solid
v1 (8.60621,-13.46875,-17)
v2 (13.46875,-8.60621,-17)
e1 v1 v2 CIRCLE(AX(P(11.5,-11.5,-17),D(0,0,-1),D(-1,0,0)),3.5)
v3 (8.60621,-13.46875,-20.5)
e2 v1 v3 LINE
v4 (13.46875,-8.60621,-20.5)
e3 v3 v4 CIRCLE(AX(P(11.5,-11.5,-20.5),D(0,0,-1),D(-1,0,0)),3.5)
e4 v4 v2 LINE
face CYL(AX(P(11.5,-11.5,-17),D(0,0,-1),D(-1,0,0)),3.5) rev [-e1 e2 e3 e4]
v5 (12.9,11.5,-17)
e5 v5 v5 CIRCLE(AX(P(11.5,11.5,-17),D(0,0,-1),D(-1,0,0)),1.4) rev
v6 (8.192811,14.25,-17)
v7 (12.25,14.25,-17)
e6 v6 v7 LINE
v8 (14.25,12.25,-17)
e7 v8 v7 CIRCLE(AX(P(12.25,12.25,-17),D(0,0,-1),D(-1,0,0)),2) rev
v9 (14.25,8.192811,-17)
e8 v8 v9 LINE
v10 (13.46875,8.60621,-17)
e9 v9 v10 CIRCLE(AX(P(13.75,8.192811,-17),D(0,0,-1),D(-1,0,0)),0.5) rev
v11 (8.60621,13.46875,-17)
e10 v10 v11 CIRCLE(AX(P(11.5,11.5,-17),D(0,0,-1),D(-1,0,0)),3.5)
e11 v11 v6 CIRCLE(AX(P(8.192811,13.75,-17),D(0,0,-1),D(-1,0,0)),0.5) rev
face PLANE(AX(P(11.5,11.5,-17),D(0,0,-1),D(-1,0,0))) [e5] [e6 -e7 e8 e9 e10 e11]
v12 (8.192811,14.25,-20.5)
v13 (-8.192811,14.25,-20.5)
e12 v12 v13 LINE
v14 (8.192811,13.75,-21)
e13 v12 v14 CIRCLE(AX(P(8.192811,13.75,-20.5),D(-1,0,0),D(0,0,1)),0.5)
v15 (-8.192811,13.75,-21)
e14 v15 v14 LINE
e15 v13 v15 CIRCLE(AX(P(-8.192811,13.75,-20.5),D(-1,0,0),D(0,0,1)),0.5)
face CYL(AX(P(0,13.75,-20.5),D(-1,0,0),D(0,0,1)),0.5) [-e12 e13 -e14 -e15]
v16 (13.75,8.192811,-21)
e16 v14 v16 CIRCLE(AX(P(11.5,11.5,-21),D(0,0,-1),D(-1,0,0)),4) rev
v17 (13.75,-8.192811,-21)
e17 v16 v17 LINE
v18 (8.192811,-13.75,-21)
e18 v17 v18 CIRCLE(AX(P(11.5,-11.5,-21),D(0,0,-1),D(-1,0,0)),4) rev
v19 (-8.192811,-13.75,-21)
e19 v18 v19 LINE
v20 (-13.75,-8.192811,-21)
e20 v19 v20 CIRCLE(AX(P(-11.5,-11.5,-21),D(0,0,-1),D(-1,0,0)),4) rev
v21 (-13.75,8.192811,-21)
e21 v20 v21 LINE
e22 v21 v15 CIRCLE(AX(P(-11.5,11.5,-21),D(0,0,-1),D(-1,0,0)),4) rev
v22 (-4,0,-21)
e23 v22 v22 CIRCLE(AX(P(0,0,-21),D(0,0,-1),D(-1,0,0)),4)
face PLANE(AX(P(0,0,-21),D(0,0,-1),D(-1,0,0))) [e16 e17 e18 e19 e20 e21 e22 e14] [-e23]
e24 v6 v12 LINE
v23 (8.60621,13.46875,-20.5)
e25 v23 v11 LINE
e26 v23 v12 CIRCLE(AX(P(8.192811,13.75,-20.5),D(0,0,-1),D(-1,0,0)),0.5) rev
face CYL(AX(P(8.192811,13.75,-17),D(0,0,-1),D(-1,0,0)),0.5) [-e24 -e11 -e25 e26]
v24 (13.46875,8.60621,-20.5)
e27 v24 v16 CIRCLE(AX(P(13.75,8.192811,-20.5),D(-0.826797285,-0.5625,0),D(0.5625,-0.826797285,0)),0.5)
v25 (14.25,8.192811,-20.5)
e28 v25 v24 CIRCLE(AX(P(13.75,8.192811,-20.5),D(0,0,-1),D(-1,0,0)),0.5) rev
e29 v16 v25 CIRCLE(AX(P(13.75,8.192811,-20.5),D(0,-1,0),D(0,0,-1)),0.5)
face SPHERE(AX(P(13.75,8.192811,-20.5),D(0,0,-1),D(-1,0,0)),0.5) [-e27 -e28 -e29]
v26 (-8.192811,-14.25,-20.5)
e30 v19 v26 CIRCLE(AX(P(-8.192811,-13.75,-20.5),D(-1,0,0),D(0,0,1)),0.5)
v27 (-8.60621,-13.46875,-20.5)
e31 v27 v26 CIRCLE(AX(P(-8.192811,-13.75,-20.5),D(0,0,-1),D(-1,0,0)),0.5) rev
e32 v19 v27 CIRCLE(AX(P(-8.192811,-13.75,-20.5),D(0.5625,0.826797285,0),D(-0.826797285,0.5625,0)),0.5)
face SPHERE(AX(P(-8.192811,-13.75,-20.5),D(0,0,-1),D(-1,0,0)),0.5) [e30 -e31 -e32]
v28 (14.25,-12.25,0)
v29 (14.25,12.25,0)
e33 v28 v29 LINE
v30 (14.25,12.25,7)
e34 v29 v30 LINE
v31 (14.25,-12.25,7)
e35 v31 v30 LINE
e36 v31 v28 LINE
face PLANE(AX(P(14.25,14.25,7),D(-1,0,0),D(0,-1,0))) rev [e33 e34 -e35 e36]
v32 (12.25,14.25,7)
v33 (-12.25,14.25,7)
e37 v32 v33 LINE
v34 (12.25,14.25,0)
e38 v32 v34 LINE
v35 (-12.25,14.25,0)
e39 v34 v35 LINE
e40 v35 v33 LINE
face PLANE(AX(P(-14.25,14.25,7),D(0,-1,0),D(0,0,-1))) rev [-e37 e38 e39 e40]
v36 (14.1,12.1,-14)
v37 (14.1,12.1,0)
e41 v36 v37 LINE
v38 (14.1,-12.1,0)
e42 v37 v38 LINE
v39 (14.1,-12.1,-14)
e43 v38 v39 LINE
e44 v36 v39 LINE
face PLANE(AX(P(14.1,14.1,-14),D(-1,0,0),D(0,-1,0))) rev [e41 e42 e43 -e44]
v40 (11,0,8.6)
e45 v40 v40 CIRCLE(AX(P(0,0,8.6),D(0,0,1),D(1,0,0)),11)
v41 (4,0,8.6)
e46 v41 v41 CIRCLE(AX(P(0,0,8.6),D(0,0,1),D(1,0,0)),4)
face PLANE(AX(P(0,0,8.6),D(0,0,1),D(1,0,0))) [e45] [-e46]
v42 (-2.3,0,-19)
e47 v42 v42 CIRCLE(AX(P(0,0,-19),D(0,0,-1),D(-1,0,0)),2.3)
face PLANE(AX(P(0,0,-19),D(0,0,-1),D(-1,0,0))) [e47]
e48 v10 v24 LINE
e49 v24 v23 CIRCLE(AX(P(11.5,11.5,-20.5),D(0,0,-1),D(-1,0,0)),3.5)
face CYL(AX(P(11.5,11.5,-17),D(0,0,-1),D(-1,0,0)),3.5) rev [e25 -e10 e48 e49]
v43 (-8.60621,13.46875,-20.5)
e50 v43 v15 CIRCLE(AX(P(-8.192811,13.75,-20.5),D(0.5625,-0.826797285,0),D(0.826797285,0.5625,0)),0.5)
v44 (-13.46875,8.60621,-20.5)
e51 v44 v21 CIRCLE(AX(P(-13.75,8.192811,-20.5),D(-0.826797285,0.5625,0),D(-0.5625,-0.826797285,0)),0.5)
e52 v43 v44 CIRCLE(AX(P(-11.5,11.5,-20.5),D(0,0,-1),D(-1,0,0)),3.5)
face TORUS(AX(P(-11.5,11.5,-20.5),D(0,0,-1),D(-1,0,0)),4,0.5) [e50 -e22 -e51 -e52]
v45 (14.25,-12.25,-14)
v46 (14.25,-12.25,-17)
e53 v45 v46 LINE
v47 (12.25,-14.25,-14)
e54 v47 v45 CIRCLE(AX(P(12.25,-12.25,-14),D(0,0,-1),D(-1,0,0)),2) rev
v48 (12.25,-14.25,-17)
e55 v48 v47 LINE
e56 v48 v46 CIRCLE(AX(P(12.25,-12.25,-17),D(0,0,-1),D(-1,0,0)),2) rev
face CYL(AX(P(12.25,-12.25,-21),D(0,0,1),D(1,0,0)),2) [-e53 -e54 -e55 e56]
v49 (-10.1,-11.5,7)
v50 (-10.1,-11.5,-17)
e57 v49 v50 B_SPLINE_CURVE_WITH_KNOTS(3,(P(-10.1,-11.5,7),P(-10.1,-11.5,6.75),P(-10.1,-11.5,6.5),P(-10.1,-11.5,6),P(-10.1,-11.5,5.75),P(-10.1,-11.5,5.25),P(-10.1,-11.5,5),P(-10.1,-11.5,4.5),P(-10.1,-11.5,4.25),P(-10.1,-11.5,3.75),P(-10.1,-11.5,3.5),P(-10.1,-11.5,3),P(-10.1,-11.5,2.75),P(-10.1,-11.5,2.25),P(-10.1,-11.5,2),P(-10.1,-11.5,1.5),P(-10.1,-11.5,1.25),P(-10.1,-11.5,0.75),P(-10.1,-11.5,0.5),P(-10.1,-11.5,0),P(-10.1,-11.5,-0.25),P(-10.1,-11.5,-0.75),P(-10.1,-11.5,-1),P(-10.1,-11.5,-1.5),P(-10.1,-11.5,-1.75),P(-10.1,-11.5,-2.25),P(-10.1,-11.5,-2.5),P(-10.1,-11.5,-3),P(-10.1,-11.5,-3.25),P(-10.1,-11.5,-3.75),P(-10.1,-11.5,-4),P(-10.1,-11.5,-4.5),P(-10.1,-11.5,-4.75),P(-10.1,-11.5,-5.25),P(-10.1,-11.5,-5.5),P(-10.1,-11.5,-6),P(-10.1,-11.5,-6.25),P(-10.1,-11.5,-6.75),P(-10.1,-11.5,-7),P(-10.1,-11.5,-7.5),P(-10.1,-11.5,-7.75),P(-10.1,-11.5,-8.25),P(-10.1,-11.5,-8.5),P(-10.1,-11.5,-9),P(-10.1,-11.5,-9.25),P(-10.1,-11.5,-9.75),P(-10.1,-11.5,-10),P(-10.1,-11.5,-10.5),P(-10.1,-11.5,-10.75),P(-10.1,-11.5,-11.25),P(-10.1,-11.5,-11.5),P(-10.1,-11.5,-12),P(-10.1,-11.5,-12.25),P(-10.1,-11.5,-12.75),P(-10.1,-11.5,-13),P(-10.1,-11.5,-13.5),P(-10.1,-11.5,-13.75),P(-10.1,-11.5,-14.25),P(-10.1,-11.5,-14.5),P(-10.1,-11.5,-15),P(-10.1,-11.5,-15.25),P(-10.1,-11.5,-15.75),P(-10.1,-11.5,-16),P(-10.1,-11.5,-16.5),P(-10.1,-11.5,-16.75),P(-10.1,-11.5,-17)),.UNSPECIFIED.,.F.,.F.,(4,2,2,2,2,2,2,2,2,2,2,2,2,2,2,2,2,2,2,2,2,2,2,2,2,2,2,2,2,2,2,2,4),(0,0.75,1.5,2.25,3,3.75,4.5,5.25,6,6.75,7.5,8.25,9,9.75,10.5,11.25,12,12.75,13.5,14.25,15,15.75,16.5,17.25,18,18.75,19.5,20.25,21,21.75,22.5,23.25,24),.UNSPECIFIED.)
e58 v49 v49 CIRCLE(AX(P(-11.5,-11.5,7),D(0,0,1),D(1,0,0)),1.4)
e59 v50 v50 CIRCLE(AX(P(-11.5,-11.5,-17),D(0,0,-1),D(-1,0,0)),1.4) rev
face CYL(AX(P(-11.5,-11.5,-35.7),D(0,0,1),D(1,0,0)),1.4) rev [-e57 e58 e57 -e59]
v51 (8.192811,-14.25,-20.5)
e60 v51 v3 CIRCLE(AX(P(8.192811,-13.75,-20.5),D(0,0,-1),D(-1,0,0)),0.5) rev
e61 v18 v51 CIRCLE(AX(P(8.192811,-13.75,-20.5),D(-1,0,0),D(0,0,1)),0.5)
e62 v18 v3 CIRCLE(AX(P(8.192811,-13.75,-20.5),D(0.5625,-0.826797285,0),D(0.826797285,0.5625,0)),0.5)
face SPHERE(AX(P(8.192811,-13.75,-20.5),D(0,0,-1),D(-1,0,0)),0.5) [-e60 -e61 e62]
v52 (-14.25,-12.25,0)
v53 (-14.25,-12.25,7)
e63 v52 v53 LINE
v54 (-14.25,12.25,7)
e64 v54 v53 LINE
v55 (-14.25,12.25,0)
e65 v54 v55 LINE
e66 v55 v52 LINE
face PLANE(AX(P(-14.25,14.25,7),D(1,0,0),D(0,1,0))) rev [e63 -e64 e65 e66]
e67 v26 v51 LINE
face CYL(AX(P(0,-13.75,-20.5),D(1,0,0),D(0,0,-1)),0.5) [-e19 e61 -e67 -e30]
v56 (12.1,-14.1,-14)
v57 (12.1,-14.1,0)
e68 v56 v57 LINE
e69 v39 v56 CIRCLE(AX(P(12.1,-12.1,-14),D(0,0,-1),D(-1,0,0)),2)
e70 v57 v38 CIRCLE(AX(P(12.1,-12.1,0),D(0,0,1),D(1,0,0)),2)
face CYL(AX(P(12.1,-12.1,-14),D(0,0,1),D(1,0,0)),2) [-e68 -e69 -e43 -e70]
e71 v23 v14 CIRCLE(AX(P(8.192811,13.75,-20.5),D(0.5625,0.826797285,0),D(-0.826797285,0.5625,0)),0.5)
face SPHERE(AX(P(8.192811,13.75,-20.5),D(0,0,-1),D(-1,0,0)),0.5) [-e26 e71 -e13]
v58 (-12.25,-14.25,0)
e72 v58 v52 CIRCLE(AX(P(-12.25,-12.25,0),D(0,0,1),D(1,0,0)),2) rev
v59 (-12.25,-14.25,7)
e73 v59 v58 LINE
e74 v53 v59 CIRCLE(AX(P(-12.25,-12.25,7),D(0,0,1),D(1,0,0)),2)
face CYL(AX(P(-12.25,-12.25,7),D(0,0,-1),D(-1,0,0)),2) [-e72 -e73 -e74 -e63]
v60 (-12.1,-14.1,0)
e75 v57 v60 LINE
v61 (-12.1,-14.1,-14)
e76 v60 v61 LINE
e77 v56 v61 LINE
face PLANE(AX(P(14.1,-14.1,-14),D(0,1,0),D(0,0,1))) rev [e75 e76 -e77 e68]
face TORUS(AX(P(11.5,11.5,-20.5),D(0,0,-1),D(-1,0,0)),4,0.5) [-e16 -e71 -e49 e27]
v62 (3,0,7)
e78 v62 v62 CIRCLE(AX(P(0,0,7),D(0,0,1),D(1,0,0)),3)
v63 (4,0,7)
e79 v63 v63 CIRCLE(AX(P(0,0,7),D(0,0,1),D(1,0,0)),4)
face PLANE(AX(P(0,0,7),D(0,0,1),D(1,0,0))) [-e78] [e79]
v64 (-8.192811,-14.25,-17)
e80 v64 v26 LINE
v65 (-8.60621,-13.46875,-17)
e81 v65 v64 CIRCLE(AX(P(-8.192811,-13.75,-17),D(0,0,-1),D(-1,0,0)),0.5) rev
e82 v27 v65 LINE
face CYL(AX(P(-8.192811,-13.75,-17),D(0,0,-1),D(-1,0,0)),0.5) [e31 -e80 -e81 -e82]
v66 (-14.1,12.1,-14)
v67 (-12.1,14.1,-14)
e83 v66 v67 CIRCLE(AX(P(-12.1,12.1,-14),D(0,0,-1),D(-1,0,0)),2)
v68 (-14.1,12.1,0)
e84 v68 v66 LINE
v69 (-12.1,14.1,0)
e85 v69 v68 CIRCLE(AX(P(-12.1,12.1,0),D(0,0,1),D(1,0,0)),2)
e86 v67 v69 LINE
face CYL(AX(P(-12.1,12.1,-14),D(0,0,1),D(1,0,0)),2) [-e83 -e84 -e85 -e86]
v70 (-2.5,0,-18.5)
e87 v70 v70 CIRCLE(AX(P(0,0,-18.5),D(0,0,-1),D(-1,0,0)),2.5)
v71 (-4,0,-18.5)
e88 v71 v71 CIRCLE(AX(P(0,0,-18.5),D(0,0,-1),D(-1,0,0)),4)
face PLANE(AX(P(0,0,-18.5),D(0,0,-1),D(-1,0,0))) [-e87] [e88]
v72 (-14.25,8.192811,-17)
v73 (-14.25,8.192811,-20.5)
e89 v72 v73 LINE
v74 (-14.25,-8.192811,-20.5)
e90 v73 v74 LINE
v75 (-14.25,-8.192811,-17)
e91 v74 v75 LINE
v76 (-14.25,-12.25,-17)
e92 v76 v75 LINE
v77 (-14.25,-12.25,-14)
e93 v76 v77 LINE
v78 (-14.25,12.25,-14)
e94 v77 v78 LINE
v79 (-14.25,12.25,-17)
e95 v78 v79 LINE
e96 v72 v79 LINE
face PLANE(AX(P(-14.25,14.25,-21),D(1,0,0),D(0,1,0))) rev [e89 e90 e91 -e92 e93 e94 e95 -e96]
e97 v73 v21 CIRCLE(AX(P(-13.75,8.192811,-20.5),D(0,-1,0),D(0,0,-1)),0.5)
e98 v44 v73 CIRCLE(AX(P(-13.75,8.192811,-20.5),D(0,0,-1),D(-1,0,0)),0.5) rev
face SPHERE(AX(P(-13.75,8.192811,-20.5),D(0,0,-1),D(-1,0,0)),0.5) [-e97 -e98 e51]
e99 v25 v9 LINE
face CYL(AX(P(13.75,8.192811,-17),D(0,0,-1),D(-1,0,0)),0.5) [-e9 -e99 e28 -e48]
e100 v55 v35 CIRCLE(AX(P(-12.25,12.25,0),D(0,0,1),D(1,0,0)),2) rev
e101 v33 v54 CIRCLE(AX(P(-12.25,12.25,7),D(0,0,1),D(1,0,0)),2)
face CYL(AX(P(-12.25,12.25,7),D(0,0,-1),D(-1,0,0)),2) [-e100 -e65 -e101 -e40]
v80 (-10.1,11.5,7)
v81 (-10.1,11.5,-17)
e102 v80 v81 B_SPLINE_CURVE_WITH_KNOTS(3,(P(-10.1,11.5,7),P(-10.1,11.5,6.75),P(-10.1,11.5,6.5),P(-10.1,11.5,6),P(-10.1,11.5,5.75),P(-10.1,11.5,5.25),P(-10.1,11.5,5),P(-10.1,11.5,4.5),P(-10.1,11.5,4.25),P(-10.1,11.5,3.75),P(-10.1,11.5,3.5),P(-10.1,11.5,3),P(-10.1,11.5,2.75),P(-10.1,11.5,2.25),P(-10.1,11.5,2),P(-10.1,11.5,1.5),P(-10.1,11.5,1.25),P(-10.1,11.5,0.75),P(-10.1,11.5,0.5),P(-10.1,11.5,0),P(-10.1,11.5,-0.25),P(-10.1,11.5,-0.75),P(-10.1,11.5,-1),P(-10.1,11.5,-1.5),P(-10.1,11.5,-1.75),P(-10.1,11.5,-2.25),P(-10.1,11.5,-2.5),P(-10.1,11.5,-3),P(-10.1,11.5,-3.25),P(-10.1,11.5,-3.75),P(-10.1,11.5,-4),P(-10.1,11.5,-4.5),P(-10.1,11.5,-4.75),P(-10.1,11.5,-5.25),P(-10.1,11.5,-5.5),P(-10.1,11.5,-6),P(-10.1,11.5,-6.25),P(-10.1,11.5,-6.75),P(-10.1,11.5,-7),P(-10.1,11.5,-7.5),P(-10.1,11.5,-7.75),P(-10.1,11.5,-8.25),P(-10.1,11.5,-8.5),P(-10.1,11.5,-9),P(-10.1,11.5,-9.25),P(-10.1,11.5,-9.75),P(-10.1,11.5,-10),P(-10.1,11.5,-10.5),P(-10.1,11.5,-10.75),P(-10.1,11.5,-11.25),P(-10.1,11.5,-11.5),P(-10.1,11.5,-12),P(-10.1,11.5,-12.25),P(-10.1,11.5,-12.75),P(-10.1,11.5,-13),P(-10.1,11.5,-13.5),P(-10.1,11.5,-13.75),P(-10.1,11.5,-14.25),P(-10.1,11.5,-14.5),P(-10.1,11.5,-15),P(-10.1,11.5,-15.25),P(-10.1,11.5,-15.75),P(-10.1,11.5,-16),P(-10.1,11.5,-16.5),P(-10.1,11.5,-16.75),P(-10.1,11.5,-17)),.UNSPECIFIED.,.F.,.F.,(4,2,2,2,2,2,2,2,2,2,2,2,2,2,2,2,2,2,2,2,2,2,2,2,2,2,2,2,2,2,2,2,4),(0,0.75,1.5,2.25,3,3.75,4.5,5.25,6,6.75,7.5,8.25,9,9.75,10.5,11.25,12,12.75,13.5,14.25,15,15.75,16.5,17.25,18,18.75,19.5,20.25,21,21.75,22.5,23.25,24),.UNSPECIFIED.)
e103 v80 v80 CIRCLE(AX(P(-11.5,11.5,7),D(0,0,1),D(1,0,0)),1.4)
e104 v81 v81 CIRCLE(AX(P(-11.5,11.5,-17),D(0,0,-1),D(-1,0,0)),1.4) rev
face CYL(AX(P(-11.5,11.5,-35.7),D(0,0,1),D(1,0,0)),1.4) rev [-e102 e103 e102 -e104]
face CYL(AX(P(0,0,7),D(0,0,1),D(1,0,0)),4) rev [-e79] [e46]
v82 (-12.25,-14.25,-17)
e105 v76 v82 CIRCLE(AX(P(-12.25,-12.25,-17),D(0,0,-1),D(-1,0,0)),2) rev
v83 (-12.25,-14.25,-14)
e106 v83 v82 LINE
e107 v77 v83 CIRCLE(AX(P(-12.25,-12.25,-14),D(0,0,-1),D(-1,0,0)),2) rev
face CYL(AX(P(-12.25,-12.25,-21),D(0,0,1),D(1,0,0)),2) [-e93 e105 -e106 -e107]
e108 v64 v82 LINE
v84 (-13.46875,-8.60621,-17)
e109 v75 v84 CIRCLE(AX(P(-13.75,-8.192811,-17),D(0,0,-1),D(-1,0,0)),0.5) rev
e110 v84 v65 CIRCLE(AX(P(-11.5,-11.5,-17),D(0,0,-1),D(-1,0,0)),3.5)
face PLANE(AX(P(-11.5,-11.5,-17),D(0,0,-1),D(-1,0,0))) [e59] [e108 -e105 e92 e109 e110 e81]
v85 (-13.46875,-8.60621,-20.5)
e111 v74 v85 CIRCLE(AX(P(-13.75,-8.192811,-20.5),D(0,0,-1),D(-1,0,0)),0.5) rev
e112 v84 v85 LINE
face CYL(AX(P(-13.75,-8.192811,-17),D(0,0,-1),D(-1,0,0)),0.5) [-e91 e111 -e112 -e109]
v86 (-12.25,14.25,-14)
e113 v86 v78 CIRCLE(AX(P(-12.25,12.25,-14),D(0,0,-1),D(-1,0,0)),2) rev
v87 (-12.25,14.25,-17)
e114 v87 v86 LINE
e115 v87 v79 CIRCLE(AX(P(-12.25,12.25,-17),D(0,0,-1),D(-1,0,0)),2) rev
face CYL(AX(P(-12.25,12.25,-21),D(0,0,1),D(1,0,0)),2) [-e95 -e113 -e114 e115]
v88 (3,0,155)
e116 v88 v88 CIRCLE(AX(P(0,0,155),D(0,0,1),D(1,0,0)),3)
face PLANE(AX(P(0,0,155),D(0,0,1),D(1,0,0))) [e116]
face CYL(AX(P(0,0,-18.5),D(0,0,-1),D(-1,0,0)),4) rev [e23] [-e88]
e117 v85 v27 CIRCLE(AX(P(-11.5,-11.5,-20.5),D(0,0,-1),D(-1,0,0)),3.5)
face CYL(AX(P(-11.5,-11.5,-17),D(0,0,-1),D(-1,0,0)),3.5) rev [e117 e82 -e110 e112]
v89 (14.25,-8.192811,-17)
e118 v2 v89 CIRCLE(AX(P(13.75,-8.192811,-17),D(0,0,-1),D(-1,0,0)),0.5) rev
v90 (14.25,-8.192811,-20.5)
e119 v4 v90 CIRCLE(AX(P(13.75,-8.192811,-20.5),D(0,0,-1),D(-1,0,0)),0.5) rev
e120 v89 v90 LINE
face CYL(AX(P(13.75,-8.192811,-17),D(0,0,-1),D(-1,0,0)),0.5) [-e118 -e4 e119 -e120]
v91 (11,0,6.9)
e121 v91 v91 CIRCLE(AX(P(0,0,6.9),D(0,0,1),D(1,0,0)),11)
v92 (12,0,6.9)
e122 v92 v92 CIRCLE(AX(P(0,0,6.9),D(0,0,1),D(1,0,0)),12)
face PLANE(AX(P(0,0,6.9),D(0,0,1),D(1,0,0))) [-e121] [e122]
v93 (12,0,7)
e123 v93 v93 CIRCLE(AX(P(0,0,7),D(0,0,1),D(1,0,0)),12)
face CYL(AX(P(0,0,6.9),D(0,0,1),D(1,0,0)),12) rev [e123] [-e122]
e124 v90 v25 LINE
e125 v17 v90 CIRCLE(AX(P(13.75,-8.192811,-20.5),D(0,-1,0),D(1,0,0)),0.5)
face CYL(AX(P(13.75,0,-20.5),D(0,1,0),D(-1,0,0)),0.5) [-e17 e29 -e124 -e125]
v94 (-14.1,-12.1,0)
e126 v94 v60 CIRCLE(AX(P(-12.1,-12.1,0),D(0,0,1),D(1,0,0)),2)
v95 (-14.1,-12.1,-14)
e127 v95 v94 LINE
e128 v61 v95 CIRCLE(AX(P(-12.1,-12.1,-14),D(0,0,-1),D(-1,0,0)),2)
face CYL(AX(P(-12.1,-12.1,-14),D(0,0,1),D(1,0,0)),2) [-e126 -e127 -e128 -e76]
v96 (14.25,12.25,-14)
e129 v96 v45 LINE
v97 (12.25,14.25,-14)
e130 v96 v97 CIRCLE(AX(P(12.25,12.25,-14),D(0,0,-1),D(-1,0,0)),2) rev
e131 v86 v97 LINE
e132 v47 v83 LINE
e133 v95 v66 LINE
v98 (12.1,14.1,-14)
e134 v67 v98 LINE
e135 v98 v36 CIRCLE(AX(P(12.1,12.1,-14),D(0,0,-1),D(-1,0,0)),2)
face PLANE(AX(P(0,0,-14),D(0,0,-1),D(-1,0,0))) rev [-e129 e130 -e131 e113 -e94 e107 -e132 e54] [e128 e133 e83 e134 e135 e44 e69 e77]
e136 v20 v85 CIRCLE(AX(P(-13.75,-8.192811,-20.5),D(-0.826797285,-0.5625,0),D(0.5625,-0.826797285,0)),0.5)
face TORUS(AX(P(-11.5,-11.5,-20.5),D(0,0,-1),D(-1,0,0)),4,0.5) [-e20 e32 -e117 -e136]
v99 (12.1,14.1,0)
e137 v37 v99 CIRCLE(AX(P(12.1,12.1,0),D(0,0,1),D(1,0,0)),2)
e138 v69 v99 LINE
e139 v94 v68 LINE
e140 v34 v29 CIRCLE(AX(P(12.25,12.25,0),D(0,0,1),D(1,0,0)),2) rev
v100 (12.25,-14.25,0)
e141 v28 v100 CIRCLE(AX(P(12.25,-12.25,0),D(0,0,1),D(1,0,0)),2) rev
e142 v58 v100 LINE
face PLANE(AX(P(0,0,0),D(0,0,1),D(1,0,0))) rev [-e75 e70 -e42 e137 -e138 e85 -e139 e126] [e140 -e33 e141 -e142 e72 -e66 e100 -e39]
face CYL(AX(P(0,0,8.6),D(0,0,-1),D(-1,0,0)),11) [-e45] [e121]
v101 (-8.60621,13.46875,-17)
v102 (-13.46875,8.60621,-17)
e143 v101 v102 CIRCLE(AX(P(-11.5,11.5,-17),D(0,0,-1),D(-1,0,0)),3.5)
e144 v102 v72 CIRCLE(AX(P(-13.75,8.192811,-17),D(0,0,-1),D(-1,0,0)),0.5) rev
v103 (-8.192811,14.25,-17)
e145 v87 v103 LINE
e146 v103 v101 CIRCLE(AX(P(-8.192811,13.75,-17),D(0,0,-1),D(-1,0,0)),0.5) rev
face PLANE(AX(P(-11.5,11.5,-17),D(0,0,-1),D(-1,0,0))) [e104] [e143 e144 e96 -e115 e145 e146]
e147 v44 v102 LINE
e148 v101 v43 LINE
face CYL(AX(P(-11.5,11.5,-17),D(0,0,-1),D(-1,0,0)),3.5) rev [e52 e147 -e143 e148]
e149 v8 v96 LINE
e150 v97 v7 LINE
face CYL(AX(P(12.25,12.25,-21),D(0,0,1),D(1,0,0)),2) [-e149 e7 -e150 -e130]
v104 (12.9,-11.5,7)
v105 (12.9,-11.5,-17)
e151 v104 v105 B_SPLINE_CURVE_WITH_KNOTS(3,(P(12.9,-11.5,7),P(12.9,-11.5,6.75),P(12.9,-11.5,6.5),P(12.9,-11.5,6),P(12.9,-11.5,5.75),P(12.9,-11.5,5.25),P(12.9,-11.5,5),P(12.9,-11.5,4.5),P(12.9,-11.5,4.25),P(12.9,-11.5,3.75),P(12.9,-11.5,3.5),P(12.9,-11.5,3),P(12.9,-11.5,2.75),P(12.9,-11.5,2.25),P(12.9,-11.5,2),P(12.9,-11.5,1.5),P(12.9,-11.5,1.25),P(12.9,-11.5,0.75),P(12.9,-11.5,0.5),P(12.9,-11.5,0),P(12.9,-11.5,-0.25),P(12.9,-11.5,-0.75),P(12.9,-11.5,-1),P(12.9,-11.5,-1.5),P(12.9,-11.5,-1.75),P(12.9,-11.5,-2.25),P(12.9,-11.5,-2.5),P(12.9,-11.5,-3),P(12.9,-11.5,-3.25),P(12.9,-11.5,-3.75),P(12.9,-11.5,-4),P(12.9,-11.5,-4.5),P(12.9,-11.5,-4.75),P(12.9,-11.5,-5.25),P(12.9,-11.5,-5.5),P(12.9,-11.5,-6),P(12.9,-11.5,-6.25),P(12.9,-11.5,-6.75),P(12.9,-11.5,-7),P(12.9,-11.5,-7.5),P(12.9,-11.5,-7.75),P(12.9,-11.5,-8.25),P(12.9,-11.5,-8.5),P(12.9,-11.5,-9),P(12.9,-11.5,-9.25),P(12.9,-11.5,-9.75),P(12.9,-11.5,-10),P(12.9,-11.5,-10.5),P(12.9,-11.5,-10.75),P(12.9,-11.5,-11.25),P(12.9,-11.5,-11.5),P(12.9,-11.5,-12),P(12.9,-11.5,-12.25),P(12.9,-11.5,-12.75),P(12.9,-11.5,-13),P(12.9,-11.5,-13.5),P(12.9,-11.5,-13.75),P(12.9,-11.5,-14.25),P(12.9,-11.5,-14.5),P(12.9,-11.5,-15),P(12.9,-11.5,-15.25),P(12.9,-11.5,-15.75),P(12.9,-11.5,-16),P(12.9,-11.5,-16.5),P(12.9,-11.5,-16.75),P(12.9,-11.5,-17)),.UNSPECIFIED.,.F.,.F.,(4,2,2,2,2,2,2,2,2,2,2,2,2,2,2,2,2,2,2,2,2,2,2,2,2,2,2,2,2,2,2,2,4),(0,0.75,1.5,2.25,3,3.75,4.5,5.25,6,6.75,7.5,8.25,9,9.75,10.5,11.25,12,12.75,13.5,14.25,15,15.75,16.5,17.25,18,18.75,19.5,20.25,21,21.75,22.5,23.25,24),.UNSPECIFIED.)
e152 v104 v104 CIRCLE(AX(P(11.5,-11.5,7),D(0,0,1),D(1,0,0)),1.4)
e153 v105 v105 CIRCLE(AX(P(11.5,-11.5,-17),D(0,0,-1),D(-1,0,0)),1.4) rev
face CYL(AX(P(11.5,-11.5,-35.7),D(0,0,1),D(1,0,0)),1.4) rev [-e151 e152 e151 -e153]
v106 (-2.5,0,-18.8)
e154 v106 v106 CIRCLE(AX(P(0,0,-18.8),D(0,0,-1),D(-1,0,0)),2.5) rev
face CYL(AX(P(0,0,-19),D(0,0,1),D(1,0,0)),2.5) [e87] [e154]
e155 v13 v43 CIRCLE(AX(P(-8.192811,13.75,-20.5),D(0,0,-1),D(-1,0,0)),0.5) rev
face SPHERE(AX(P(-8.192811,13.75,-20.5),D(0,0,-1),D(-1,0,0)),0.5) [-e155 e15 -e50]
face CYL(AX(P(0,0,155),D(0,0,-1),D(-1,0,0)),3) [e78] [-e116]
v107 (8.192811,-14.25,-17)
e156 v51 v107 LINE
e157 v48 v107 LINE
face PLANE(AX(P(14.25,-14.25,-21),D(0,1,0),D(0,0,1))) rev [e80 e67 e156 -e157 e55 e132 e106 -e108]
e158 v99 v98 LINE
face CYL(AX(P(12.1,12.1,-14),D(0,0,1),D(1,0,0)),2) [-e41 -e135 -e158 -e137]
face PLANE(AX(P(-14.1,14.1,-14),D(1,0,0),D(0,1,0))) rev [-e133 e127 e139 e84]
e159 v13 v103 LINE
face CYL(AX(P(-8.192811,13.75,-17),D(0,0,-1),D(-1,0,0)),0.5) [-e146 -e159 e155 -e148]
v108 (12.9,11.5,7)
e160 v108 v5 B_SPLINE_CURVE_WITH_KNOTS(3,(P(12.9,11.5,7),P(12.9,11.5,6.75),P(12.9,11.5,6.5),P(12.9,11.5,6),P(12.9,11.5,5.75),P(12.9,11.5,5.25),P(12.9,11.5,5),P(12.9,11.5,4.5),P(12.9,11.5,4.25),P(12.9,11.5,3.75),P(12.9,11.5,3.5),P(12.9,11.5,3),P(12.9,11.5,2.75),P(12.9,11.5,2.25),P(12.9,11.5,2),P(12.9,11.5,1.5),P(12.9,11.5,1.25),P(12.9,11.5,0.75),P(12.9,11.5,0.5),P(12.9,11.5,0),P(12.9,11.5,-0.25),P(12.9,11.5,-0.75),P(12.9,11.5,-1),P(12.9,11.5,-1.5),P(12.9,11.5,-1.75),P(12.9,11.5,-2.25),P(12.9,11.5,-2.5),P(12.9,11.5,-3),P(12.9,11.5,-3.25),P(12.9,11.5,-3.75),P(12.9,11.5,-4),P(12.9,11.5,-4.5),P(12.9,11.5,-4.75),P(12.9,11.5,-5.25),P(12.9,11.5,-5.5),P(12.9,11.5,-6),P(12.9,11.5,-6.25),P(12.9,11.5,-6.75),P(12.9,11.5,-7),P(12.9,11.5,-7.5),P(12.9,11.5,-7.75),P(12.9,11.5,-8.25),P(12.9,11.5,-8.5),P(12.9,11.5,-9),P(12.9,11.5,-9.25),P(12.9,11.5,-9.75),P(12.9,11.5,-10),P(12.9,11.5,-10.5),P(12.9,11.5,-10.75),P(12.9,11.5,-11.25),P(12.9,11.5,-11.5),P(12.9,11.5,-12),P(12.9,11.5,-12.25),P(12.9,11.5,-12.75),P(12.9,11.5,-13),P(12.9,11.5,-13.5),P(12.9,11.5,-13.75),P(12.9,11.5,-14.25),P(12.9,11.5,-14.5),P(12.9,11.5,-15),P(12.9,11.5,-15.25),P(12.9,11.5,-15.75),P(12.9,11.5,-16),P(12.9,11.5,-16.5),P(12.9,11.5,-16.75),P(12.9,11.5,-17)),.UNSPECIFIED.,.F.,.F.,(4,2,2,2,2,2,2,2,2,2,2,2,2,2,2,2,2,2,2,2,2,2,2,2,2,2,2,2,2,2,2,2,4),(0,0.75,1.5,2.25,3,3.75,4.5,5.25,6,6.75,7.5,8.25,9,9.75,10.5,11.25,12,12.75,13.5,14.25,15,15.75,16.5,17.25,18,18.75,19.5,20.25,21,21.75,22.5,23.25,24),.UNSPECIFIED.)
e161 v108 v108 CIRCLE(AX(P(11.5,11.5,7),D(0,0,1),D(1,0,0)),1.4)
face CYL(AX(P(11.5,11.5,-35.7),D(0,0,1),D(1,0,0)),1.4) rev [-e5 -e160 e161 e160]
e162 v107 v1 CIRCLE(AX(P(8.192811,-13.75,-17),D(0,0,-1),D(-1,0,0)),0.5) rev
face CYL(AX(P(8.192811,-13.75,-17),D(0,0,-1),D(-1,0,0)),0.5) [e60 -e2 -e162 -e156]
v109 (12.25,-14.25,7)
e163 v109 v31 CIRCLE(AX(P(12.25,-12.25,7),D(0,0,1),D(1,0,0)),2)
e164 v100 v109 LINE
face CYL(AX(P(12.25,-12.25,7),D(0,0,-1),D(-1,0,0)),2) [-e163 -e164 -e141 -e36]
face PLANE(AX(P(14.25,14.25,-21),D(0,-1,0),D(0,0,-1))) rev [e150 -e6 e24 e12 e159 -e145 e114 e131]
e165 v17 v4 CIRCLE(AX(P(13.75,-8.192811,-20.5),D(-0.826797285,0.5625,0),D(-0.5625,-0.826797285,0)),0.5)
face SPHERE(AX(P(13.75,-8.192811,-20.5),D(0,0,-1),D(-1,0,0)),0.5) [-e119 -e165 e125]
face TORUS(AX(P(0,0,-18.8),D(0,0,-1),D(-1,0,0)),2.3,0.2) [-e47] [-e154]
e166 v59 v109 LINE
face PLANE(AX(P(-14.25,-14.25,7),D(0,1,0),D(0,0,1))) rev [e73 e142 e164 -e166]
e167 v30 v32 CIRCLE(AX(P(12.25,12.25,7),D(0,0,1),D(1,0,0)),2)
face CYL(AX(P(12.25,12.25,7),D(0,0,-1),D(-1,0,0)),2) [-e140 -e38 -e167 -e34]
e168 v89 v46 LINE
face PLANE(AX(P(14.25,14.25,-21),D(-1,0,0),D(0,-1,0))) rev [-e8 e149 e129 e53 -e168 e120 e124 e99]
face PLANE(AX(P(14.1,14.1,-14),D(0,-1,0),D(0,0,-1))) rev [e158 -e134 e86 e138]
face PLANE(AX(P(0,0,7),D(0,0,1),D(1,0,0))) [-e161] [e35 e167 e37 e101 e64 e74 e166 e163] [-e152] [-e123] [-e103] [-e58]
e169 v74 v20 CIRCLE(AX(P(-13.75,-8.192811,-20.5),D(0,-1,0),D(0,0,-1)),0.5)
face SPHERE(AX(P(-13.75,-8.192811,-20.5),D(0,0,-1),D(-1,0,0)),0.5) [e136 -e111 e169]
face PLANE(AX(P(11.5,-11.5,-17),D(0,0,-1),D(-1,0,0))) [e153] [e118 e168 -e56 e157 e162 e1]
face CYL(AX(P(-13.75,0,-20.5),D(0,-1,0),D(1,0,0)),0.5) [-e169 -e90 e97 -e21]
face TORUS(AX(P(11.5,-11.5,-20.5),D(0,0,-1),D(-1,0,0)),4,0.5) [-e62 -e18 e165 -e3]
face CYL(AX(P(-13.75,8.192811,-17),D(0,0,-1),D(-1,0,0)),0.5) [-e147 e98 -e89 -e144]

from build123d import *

# Parameters (mm, degrees)
SKETCH1_W           = 28.5
SKETCH1_H           = 28.5
BOSS_EXTRUDE1_DEPTH = 7
FILLET1_R           = 2
SKETCH2_R           = 11
BOSS_EXTRUDE2_DEPTH = 1.6
SKETCH3_R           = 4
CUT_EXTRUDE1_DEPTH  = 1.6
SKETCH6_W           = 28.2
SKETCH6_H           = 28.2
BOSS_EXTRUDE4_DEPTH = 14
FILLET2_R           = 2
SKETCH7_W           = 28.5
SKETCH7_H           = 28.5
BOSS_EXTRUDE5_DEPTH = 7
FILLET3_R           = 2
SKETCH9_R           = 1.4
CUT_EXTRUDE3_DEPTH  = 42.7
SKETCH10_R          = 3.5
CUT_EXTRUDE4_DEPTH  = 4
FILLET4_R           = 0.5
FILLET5_R           = 0.5
CUT_EXTRUDE5_START  = -0.1
SKETCH11_R          = 12
SKETCH11_R_2        = 11
CUT_EXTRUDE5_DEPTH  = 0.1
CUT_EXTRUDE6_START  = -2.5
SKETCH12_R          = 4
CUT_EXTRUDE6_DEPTH  = 2.5
SKETCH13_R          = 2.5
BOSS_EXTRUDE7_DEPTH = 0.5
FILLET6_R           = 0.2
SKETCH_1_R          = 3
SHAFT_DEPTH         = 148


with BuildPart() as part:
    # Sketch1 → Boss-Extrude1 (new body)
    with BuildSketch(Plane.XY):
        Rectangle(SKETCH1_W, SKETCH1_H)
    extrude(amount=BOSS_EXTRUDE1_DEPTH)

    # Fillet1
    fillet1_edges = [part.edges().sort_by_distance(p)[0] for p in [
        (14.25, -14.25, 3.5),
        (-14.25, -14.25, 3.5),
        (-14.25, 14.25, 3.5),
        (14.25, 14.25, 3.5),
    ]]
    fillet(fillet1_edges, radius=FILLET1_R)

    # Sketch2 → Boss-Extrude2 (add)
    with BuildSketch(Plane.XY.offset(7)):
        Circle(SKETCH2_R)
    extrude(amount=BOSS_EXTRUDE2_DEPTH)

    # Sketch3 → Cut-Extrude1 (cut)
    with BuildSketch(Plane.XY.offset(8.6)):
        Circle(SKETCH3_R)
    extrude(amount=-CUT_EXTRUDE1_DEPTH, mode=Mode.SUBTRACT)

    # Sketch6 → Boss-Extrude4 (add)
    with BuildSketch(Plane(origin=(0, 0, 0), x_dir=(-1, 0, 0), z_dir=(0, 0, -1))):
        Rectangle(SKETCH6_W, SKETCH6_H)
    extrude(amount=BOSS_EXTRUDE4_DEPTH)

    # Fillet2
    # the kernel refuses this fillet: 2 mm, written as the material it takes off along each edge
    with BuildSketch(Plane(origin=(-14.1, -14.1, 0), x_dir=(0, 1, 0), z_dir=(0, 0, -1)), Plane(origin=(-14.1, 14.1, 0), x_dir=(1, 0, 0), z_dir=(0, 0, -1))) as fillet2_piece_1:
        with BuildLine():
            CenterArc((FILLET2_R, FILLET2_R), FILLET2_R, 180, 90)
            Line((0, FILLET2_R), (0, 0))
            Line((0, 0), (FILLET2_R, 0))
        make_face()
    extrude(amount=19, mode=Mode.SUBTRACT)
    with BuildSketch(Plane(origin=(14.1, 14.1, 0), x_dir=(-1, 0, 0), z_dir=(0, 0, -1)), Plane(origin=(14.1, -14.1, 0), x_dir=(0, 1, 0), z_dir=(0, 0, -1))) as fillet2_piece_2:
        with BuildLine():
            CenterArc((FILLET2_R, -FILLET2_R), FILLET2_R, 90, 90)
            Line((0, -FILLET2_R), (0, 0))
            Line((0, 0), (FILLET2_R, 0))
        make_face()
    extrude(amount=19, mode=Mode.SUBTRACT)

    # Sketch7 → Boss-Extrude5 (add)
    with BuildSketch(Plane(origin=(0, 0, -14), x_dir=(-1, 0, 0), z_dir=(0, 0, -1))):
        Rectangle(SKETCH7_W, SKETCH7_H)
    extrude(amount=BOSS_EXTRUDE5_DEPTH)

    # Fillet3
    fillet3_edges = [part.edges().sort_by_distance(p)[0] for p in [
        (-14.25, -14.25, -17.5),
        (-14.25, 14.25, -17.5),
        (14.25, 14.25, -17.5),
        (14.25, -14.25, -17.5),
    ]]
    fillet(fillet3_edges, radius=FILLET3_R)

    # Sketch9 → Cut-Extrude3 (cut)
    with BuildSketch(Plane.XY.offset(7)):
        with Locations((-11.5, 11.5)):
            Circle(SKETCH9_R)
        with Locations((11.5, 11.5)):
            Circle(SKETCH9_R)
        with Locations((11.5, -11.5)):
            Circle(SKETCH9_R)
        with Locations((-11.5, -11.5)):
            Circle(SKETCH9_R)
    extrude(amount=-CUT_EXTRUDE3_DEPTH, mode=Mode.SUBTRACT)

    # Sketch10 → Cut-Extrude4 (cut)
    with BuildSketch(Plane(origin=(0, 0, -21), x_dir=(-1, 0, 0), z_dir=(0, 0, -1))):
        with Locations((-11.5, 11.5)):
            Circle(SKETCH10_R)
        with Locations((11.5, 11.5)):
            Circle(SKETCH10_R)
        with Locations((11.5, -11.5)):
            Circle(SKETCH10_R)
        with Locations((-11.5, -11.5)):
            Circle(SKETCH10_R)
    extrude(amount=-CUT_EXTRUDE4_DEPTH, mode=Mode.SUBTRACT)

    # Fillet4
    fillet4_edges = [part.edges().sort_by_distance(p)[0] for p in [
        (14.25, -9.334936491, -19),
        (9.334936491, -14.25, -19),
        (-14.25, -9.334936491, -19),
        (-9.334936491, -14.25, -19),
        (-14.25, 9.334936491, -19),
        (-9.334936491, 14.25, -19),
        (9.334936491, 14.25, -19),
        (14.25, 9.334936491, -19),
    ]]
    fillet(fillet4_edges, radius=FILLET4_R)

    # Fillet5
    fillet5_edges = [part.edges().sort_by_distance(p)[0] for p in [
        (-14.25, 0, -21),
        (9.025126266, -9.025126266, -21),
        (0, -14.25, -21),
        (-9.025126266, -9.025126266, -21),
        (-9.025126266, 9.025126266, -21),
        (0, 14.25, -21),
        (9.025126266, 9.025126266, -21),
        (14.25, 0, -21),
        (13.983853587, 8.634752599, -21),
        (8.634752599, 13.983853587, -21),
        (13.983853587, -8.634752599, -21),
        (8.634752599, -13.983853587, -21),
        (-8.634752599, -13.983853587, -21),
        (-13.983853587, -8.634752599, -21),
        (-8.634752599, 13.983853587, -21),
        (-13.983853587, 8.634752599, -21),
    ]]
    fillet(fillet5_edges, radius=FILLET5_R)

    # Sketch11 → Cut-Extrude5 (cut)
    with BuildSketch(Plane.XY.offset(7).offset(CUT_EXTRUDE5_START)):
        Circle(SKETCH11_R)
        Circle(SKETCH11_R_2, mode=Mode.SUBTRACT)
    extrude(amount=CUT_EXTRUDE5_DEPTH, mode=Mode.SUBTRACT)

    # Sketch12 → Cut-Extrude6 (cut)
    with BuildSketch(Plane(origin=(0, 0, -21), x_dir=(-1, 0, 0), z_dir=(0, 0, -1)).offset(CUT_EXTRUDE6_START)):
        with Locations(Location((0, 0, 0), (0, 0, 180))):
            Circle(SKETCH12_R)
    extrude(amount=CUT_EXTRUDE6_DEPTH, mode=Mode.SUBTRACT)

    # Sketch13 → Boss-Extrude7 (add)
    with BuildSketch(Plane(origin=(0, 0, -18.5), x_dir=(-1, 0, 0), z_dir=(0, 0, -1))):
        Circle(SKETCH13_R)
    extrude(amount=BOSS_EXTRUDE7_DEPTH)

    # Fillet6
    fillet6_edges = [part.edges().sort_by_distance(p)[0] for p in [
        (2.5, 0, -19),
    ]]
    fillet(fillet6_edges, radius=FILLET6_R)

    # Эскиз1 → Shaft (add)
    with BuildSketch(Plane.XY.offset(7)):
        Circle(SKETCH_1_R)
    extrude(amount=SHAFT_DEPTH)


solid = part.part
